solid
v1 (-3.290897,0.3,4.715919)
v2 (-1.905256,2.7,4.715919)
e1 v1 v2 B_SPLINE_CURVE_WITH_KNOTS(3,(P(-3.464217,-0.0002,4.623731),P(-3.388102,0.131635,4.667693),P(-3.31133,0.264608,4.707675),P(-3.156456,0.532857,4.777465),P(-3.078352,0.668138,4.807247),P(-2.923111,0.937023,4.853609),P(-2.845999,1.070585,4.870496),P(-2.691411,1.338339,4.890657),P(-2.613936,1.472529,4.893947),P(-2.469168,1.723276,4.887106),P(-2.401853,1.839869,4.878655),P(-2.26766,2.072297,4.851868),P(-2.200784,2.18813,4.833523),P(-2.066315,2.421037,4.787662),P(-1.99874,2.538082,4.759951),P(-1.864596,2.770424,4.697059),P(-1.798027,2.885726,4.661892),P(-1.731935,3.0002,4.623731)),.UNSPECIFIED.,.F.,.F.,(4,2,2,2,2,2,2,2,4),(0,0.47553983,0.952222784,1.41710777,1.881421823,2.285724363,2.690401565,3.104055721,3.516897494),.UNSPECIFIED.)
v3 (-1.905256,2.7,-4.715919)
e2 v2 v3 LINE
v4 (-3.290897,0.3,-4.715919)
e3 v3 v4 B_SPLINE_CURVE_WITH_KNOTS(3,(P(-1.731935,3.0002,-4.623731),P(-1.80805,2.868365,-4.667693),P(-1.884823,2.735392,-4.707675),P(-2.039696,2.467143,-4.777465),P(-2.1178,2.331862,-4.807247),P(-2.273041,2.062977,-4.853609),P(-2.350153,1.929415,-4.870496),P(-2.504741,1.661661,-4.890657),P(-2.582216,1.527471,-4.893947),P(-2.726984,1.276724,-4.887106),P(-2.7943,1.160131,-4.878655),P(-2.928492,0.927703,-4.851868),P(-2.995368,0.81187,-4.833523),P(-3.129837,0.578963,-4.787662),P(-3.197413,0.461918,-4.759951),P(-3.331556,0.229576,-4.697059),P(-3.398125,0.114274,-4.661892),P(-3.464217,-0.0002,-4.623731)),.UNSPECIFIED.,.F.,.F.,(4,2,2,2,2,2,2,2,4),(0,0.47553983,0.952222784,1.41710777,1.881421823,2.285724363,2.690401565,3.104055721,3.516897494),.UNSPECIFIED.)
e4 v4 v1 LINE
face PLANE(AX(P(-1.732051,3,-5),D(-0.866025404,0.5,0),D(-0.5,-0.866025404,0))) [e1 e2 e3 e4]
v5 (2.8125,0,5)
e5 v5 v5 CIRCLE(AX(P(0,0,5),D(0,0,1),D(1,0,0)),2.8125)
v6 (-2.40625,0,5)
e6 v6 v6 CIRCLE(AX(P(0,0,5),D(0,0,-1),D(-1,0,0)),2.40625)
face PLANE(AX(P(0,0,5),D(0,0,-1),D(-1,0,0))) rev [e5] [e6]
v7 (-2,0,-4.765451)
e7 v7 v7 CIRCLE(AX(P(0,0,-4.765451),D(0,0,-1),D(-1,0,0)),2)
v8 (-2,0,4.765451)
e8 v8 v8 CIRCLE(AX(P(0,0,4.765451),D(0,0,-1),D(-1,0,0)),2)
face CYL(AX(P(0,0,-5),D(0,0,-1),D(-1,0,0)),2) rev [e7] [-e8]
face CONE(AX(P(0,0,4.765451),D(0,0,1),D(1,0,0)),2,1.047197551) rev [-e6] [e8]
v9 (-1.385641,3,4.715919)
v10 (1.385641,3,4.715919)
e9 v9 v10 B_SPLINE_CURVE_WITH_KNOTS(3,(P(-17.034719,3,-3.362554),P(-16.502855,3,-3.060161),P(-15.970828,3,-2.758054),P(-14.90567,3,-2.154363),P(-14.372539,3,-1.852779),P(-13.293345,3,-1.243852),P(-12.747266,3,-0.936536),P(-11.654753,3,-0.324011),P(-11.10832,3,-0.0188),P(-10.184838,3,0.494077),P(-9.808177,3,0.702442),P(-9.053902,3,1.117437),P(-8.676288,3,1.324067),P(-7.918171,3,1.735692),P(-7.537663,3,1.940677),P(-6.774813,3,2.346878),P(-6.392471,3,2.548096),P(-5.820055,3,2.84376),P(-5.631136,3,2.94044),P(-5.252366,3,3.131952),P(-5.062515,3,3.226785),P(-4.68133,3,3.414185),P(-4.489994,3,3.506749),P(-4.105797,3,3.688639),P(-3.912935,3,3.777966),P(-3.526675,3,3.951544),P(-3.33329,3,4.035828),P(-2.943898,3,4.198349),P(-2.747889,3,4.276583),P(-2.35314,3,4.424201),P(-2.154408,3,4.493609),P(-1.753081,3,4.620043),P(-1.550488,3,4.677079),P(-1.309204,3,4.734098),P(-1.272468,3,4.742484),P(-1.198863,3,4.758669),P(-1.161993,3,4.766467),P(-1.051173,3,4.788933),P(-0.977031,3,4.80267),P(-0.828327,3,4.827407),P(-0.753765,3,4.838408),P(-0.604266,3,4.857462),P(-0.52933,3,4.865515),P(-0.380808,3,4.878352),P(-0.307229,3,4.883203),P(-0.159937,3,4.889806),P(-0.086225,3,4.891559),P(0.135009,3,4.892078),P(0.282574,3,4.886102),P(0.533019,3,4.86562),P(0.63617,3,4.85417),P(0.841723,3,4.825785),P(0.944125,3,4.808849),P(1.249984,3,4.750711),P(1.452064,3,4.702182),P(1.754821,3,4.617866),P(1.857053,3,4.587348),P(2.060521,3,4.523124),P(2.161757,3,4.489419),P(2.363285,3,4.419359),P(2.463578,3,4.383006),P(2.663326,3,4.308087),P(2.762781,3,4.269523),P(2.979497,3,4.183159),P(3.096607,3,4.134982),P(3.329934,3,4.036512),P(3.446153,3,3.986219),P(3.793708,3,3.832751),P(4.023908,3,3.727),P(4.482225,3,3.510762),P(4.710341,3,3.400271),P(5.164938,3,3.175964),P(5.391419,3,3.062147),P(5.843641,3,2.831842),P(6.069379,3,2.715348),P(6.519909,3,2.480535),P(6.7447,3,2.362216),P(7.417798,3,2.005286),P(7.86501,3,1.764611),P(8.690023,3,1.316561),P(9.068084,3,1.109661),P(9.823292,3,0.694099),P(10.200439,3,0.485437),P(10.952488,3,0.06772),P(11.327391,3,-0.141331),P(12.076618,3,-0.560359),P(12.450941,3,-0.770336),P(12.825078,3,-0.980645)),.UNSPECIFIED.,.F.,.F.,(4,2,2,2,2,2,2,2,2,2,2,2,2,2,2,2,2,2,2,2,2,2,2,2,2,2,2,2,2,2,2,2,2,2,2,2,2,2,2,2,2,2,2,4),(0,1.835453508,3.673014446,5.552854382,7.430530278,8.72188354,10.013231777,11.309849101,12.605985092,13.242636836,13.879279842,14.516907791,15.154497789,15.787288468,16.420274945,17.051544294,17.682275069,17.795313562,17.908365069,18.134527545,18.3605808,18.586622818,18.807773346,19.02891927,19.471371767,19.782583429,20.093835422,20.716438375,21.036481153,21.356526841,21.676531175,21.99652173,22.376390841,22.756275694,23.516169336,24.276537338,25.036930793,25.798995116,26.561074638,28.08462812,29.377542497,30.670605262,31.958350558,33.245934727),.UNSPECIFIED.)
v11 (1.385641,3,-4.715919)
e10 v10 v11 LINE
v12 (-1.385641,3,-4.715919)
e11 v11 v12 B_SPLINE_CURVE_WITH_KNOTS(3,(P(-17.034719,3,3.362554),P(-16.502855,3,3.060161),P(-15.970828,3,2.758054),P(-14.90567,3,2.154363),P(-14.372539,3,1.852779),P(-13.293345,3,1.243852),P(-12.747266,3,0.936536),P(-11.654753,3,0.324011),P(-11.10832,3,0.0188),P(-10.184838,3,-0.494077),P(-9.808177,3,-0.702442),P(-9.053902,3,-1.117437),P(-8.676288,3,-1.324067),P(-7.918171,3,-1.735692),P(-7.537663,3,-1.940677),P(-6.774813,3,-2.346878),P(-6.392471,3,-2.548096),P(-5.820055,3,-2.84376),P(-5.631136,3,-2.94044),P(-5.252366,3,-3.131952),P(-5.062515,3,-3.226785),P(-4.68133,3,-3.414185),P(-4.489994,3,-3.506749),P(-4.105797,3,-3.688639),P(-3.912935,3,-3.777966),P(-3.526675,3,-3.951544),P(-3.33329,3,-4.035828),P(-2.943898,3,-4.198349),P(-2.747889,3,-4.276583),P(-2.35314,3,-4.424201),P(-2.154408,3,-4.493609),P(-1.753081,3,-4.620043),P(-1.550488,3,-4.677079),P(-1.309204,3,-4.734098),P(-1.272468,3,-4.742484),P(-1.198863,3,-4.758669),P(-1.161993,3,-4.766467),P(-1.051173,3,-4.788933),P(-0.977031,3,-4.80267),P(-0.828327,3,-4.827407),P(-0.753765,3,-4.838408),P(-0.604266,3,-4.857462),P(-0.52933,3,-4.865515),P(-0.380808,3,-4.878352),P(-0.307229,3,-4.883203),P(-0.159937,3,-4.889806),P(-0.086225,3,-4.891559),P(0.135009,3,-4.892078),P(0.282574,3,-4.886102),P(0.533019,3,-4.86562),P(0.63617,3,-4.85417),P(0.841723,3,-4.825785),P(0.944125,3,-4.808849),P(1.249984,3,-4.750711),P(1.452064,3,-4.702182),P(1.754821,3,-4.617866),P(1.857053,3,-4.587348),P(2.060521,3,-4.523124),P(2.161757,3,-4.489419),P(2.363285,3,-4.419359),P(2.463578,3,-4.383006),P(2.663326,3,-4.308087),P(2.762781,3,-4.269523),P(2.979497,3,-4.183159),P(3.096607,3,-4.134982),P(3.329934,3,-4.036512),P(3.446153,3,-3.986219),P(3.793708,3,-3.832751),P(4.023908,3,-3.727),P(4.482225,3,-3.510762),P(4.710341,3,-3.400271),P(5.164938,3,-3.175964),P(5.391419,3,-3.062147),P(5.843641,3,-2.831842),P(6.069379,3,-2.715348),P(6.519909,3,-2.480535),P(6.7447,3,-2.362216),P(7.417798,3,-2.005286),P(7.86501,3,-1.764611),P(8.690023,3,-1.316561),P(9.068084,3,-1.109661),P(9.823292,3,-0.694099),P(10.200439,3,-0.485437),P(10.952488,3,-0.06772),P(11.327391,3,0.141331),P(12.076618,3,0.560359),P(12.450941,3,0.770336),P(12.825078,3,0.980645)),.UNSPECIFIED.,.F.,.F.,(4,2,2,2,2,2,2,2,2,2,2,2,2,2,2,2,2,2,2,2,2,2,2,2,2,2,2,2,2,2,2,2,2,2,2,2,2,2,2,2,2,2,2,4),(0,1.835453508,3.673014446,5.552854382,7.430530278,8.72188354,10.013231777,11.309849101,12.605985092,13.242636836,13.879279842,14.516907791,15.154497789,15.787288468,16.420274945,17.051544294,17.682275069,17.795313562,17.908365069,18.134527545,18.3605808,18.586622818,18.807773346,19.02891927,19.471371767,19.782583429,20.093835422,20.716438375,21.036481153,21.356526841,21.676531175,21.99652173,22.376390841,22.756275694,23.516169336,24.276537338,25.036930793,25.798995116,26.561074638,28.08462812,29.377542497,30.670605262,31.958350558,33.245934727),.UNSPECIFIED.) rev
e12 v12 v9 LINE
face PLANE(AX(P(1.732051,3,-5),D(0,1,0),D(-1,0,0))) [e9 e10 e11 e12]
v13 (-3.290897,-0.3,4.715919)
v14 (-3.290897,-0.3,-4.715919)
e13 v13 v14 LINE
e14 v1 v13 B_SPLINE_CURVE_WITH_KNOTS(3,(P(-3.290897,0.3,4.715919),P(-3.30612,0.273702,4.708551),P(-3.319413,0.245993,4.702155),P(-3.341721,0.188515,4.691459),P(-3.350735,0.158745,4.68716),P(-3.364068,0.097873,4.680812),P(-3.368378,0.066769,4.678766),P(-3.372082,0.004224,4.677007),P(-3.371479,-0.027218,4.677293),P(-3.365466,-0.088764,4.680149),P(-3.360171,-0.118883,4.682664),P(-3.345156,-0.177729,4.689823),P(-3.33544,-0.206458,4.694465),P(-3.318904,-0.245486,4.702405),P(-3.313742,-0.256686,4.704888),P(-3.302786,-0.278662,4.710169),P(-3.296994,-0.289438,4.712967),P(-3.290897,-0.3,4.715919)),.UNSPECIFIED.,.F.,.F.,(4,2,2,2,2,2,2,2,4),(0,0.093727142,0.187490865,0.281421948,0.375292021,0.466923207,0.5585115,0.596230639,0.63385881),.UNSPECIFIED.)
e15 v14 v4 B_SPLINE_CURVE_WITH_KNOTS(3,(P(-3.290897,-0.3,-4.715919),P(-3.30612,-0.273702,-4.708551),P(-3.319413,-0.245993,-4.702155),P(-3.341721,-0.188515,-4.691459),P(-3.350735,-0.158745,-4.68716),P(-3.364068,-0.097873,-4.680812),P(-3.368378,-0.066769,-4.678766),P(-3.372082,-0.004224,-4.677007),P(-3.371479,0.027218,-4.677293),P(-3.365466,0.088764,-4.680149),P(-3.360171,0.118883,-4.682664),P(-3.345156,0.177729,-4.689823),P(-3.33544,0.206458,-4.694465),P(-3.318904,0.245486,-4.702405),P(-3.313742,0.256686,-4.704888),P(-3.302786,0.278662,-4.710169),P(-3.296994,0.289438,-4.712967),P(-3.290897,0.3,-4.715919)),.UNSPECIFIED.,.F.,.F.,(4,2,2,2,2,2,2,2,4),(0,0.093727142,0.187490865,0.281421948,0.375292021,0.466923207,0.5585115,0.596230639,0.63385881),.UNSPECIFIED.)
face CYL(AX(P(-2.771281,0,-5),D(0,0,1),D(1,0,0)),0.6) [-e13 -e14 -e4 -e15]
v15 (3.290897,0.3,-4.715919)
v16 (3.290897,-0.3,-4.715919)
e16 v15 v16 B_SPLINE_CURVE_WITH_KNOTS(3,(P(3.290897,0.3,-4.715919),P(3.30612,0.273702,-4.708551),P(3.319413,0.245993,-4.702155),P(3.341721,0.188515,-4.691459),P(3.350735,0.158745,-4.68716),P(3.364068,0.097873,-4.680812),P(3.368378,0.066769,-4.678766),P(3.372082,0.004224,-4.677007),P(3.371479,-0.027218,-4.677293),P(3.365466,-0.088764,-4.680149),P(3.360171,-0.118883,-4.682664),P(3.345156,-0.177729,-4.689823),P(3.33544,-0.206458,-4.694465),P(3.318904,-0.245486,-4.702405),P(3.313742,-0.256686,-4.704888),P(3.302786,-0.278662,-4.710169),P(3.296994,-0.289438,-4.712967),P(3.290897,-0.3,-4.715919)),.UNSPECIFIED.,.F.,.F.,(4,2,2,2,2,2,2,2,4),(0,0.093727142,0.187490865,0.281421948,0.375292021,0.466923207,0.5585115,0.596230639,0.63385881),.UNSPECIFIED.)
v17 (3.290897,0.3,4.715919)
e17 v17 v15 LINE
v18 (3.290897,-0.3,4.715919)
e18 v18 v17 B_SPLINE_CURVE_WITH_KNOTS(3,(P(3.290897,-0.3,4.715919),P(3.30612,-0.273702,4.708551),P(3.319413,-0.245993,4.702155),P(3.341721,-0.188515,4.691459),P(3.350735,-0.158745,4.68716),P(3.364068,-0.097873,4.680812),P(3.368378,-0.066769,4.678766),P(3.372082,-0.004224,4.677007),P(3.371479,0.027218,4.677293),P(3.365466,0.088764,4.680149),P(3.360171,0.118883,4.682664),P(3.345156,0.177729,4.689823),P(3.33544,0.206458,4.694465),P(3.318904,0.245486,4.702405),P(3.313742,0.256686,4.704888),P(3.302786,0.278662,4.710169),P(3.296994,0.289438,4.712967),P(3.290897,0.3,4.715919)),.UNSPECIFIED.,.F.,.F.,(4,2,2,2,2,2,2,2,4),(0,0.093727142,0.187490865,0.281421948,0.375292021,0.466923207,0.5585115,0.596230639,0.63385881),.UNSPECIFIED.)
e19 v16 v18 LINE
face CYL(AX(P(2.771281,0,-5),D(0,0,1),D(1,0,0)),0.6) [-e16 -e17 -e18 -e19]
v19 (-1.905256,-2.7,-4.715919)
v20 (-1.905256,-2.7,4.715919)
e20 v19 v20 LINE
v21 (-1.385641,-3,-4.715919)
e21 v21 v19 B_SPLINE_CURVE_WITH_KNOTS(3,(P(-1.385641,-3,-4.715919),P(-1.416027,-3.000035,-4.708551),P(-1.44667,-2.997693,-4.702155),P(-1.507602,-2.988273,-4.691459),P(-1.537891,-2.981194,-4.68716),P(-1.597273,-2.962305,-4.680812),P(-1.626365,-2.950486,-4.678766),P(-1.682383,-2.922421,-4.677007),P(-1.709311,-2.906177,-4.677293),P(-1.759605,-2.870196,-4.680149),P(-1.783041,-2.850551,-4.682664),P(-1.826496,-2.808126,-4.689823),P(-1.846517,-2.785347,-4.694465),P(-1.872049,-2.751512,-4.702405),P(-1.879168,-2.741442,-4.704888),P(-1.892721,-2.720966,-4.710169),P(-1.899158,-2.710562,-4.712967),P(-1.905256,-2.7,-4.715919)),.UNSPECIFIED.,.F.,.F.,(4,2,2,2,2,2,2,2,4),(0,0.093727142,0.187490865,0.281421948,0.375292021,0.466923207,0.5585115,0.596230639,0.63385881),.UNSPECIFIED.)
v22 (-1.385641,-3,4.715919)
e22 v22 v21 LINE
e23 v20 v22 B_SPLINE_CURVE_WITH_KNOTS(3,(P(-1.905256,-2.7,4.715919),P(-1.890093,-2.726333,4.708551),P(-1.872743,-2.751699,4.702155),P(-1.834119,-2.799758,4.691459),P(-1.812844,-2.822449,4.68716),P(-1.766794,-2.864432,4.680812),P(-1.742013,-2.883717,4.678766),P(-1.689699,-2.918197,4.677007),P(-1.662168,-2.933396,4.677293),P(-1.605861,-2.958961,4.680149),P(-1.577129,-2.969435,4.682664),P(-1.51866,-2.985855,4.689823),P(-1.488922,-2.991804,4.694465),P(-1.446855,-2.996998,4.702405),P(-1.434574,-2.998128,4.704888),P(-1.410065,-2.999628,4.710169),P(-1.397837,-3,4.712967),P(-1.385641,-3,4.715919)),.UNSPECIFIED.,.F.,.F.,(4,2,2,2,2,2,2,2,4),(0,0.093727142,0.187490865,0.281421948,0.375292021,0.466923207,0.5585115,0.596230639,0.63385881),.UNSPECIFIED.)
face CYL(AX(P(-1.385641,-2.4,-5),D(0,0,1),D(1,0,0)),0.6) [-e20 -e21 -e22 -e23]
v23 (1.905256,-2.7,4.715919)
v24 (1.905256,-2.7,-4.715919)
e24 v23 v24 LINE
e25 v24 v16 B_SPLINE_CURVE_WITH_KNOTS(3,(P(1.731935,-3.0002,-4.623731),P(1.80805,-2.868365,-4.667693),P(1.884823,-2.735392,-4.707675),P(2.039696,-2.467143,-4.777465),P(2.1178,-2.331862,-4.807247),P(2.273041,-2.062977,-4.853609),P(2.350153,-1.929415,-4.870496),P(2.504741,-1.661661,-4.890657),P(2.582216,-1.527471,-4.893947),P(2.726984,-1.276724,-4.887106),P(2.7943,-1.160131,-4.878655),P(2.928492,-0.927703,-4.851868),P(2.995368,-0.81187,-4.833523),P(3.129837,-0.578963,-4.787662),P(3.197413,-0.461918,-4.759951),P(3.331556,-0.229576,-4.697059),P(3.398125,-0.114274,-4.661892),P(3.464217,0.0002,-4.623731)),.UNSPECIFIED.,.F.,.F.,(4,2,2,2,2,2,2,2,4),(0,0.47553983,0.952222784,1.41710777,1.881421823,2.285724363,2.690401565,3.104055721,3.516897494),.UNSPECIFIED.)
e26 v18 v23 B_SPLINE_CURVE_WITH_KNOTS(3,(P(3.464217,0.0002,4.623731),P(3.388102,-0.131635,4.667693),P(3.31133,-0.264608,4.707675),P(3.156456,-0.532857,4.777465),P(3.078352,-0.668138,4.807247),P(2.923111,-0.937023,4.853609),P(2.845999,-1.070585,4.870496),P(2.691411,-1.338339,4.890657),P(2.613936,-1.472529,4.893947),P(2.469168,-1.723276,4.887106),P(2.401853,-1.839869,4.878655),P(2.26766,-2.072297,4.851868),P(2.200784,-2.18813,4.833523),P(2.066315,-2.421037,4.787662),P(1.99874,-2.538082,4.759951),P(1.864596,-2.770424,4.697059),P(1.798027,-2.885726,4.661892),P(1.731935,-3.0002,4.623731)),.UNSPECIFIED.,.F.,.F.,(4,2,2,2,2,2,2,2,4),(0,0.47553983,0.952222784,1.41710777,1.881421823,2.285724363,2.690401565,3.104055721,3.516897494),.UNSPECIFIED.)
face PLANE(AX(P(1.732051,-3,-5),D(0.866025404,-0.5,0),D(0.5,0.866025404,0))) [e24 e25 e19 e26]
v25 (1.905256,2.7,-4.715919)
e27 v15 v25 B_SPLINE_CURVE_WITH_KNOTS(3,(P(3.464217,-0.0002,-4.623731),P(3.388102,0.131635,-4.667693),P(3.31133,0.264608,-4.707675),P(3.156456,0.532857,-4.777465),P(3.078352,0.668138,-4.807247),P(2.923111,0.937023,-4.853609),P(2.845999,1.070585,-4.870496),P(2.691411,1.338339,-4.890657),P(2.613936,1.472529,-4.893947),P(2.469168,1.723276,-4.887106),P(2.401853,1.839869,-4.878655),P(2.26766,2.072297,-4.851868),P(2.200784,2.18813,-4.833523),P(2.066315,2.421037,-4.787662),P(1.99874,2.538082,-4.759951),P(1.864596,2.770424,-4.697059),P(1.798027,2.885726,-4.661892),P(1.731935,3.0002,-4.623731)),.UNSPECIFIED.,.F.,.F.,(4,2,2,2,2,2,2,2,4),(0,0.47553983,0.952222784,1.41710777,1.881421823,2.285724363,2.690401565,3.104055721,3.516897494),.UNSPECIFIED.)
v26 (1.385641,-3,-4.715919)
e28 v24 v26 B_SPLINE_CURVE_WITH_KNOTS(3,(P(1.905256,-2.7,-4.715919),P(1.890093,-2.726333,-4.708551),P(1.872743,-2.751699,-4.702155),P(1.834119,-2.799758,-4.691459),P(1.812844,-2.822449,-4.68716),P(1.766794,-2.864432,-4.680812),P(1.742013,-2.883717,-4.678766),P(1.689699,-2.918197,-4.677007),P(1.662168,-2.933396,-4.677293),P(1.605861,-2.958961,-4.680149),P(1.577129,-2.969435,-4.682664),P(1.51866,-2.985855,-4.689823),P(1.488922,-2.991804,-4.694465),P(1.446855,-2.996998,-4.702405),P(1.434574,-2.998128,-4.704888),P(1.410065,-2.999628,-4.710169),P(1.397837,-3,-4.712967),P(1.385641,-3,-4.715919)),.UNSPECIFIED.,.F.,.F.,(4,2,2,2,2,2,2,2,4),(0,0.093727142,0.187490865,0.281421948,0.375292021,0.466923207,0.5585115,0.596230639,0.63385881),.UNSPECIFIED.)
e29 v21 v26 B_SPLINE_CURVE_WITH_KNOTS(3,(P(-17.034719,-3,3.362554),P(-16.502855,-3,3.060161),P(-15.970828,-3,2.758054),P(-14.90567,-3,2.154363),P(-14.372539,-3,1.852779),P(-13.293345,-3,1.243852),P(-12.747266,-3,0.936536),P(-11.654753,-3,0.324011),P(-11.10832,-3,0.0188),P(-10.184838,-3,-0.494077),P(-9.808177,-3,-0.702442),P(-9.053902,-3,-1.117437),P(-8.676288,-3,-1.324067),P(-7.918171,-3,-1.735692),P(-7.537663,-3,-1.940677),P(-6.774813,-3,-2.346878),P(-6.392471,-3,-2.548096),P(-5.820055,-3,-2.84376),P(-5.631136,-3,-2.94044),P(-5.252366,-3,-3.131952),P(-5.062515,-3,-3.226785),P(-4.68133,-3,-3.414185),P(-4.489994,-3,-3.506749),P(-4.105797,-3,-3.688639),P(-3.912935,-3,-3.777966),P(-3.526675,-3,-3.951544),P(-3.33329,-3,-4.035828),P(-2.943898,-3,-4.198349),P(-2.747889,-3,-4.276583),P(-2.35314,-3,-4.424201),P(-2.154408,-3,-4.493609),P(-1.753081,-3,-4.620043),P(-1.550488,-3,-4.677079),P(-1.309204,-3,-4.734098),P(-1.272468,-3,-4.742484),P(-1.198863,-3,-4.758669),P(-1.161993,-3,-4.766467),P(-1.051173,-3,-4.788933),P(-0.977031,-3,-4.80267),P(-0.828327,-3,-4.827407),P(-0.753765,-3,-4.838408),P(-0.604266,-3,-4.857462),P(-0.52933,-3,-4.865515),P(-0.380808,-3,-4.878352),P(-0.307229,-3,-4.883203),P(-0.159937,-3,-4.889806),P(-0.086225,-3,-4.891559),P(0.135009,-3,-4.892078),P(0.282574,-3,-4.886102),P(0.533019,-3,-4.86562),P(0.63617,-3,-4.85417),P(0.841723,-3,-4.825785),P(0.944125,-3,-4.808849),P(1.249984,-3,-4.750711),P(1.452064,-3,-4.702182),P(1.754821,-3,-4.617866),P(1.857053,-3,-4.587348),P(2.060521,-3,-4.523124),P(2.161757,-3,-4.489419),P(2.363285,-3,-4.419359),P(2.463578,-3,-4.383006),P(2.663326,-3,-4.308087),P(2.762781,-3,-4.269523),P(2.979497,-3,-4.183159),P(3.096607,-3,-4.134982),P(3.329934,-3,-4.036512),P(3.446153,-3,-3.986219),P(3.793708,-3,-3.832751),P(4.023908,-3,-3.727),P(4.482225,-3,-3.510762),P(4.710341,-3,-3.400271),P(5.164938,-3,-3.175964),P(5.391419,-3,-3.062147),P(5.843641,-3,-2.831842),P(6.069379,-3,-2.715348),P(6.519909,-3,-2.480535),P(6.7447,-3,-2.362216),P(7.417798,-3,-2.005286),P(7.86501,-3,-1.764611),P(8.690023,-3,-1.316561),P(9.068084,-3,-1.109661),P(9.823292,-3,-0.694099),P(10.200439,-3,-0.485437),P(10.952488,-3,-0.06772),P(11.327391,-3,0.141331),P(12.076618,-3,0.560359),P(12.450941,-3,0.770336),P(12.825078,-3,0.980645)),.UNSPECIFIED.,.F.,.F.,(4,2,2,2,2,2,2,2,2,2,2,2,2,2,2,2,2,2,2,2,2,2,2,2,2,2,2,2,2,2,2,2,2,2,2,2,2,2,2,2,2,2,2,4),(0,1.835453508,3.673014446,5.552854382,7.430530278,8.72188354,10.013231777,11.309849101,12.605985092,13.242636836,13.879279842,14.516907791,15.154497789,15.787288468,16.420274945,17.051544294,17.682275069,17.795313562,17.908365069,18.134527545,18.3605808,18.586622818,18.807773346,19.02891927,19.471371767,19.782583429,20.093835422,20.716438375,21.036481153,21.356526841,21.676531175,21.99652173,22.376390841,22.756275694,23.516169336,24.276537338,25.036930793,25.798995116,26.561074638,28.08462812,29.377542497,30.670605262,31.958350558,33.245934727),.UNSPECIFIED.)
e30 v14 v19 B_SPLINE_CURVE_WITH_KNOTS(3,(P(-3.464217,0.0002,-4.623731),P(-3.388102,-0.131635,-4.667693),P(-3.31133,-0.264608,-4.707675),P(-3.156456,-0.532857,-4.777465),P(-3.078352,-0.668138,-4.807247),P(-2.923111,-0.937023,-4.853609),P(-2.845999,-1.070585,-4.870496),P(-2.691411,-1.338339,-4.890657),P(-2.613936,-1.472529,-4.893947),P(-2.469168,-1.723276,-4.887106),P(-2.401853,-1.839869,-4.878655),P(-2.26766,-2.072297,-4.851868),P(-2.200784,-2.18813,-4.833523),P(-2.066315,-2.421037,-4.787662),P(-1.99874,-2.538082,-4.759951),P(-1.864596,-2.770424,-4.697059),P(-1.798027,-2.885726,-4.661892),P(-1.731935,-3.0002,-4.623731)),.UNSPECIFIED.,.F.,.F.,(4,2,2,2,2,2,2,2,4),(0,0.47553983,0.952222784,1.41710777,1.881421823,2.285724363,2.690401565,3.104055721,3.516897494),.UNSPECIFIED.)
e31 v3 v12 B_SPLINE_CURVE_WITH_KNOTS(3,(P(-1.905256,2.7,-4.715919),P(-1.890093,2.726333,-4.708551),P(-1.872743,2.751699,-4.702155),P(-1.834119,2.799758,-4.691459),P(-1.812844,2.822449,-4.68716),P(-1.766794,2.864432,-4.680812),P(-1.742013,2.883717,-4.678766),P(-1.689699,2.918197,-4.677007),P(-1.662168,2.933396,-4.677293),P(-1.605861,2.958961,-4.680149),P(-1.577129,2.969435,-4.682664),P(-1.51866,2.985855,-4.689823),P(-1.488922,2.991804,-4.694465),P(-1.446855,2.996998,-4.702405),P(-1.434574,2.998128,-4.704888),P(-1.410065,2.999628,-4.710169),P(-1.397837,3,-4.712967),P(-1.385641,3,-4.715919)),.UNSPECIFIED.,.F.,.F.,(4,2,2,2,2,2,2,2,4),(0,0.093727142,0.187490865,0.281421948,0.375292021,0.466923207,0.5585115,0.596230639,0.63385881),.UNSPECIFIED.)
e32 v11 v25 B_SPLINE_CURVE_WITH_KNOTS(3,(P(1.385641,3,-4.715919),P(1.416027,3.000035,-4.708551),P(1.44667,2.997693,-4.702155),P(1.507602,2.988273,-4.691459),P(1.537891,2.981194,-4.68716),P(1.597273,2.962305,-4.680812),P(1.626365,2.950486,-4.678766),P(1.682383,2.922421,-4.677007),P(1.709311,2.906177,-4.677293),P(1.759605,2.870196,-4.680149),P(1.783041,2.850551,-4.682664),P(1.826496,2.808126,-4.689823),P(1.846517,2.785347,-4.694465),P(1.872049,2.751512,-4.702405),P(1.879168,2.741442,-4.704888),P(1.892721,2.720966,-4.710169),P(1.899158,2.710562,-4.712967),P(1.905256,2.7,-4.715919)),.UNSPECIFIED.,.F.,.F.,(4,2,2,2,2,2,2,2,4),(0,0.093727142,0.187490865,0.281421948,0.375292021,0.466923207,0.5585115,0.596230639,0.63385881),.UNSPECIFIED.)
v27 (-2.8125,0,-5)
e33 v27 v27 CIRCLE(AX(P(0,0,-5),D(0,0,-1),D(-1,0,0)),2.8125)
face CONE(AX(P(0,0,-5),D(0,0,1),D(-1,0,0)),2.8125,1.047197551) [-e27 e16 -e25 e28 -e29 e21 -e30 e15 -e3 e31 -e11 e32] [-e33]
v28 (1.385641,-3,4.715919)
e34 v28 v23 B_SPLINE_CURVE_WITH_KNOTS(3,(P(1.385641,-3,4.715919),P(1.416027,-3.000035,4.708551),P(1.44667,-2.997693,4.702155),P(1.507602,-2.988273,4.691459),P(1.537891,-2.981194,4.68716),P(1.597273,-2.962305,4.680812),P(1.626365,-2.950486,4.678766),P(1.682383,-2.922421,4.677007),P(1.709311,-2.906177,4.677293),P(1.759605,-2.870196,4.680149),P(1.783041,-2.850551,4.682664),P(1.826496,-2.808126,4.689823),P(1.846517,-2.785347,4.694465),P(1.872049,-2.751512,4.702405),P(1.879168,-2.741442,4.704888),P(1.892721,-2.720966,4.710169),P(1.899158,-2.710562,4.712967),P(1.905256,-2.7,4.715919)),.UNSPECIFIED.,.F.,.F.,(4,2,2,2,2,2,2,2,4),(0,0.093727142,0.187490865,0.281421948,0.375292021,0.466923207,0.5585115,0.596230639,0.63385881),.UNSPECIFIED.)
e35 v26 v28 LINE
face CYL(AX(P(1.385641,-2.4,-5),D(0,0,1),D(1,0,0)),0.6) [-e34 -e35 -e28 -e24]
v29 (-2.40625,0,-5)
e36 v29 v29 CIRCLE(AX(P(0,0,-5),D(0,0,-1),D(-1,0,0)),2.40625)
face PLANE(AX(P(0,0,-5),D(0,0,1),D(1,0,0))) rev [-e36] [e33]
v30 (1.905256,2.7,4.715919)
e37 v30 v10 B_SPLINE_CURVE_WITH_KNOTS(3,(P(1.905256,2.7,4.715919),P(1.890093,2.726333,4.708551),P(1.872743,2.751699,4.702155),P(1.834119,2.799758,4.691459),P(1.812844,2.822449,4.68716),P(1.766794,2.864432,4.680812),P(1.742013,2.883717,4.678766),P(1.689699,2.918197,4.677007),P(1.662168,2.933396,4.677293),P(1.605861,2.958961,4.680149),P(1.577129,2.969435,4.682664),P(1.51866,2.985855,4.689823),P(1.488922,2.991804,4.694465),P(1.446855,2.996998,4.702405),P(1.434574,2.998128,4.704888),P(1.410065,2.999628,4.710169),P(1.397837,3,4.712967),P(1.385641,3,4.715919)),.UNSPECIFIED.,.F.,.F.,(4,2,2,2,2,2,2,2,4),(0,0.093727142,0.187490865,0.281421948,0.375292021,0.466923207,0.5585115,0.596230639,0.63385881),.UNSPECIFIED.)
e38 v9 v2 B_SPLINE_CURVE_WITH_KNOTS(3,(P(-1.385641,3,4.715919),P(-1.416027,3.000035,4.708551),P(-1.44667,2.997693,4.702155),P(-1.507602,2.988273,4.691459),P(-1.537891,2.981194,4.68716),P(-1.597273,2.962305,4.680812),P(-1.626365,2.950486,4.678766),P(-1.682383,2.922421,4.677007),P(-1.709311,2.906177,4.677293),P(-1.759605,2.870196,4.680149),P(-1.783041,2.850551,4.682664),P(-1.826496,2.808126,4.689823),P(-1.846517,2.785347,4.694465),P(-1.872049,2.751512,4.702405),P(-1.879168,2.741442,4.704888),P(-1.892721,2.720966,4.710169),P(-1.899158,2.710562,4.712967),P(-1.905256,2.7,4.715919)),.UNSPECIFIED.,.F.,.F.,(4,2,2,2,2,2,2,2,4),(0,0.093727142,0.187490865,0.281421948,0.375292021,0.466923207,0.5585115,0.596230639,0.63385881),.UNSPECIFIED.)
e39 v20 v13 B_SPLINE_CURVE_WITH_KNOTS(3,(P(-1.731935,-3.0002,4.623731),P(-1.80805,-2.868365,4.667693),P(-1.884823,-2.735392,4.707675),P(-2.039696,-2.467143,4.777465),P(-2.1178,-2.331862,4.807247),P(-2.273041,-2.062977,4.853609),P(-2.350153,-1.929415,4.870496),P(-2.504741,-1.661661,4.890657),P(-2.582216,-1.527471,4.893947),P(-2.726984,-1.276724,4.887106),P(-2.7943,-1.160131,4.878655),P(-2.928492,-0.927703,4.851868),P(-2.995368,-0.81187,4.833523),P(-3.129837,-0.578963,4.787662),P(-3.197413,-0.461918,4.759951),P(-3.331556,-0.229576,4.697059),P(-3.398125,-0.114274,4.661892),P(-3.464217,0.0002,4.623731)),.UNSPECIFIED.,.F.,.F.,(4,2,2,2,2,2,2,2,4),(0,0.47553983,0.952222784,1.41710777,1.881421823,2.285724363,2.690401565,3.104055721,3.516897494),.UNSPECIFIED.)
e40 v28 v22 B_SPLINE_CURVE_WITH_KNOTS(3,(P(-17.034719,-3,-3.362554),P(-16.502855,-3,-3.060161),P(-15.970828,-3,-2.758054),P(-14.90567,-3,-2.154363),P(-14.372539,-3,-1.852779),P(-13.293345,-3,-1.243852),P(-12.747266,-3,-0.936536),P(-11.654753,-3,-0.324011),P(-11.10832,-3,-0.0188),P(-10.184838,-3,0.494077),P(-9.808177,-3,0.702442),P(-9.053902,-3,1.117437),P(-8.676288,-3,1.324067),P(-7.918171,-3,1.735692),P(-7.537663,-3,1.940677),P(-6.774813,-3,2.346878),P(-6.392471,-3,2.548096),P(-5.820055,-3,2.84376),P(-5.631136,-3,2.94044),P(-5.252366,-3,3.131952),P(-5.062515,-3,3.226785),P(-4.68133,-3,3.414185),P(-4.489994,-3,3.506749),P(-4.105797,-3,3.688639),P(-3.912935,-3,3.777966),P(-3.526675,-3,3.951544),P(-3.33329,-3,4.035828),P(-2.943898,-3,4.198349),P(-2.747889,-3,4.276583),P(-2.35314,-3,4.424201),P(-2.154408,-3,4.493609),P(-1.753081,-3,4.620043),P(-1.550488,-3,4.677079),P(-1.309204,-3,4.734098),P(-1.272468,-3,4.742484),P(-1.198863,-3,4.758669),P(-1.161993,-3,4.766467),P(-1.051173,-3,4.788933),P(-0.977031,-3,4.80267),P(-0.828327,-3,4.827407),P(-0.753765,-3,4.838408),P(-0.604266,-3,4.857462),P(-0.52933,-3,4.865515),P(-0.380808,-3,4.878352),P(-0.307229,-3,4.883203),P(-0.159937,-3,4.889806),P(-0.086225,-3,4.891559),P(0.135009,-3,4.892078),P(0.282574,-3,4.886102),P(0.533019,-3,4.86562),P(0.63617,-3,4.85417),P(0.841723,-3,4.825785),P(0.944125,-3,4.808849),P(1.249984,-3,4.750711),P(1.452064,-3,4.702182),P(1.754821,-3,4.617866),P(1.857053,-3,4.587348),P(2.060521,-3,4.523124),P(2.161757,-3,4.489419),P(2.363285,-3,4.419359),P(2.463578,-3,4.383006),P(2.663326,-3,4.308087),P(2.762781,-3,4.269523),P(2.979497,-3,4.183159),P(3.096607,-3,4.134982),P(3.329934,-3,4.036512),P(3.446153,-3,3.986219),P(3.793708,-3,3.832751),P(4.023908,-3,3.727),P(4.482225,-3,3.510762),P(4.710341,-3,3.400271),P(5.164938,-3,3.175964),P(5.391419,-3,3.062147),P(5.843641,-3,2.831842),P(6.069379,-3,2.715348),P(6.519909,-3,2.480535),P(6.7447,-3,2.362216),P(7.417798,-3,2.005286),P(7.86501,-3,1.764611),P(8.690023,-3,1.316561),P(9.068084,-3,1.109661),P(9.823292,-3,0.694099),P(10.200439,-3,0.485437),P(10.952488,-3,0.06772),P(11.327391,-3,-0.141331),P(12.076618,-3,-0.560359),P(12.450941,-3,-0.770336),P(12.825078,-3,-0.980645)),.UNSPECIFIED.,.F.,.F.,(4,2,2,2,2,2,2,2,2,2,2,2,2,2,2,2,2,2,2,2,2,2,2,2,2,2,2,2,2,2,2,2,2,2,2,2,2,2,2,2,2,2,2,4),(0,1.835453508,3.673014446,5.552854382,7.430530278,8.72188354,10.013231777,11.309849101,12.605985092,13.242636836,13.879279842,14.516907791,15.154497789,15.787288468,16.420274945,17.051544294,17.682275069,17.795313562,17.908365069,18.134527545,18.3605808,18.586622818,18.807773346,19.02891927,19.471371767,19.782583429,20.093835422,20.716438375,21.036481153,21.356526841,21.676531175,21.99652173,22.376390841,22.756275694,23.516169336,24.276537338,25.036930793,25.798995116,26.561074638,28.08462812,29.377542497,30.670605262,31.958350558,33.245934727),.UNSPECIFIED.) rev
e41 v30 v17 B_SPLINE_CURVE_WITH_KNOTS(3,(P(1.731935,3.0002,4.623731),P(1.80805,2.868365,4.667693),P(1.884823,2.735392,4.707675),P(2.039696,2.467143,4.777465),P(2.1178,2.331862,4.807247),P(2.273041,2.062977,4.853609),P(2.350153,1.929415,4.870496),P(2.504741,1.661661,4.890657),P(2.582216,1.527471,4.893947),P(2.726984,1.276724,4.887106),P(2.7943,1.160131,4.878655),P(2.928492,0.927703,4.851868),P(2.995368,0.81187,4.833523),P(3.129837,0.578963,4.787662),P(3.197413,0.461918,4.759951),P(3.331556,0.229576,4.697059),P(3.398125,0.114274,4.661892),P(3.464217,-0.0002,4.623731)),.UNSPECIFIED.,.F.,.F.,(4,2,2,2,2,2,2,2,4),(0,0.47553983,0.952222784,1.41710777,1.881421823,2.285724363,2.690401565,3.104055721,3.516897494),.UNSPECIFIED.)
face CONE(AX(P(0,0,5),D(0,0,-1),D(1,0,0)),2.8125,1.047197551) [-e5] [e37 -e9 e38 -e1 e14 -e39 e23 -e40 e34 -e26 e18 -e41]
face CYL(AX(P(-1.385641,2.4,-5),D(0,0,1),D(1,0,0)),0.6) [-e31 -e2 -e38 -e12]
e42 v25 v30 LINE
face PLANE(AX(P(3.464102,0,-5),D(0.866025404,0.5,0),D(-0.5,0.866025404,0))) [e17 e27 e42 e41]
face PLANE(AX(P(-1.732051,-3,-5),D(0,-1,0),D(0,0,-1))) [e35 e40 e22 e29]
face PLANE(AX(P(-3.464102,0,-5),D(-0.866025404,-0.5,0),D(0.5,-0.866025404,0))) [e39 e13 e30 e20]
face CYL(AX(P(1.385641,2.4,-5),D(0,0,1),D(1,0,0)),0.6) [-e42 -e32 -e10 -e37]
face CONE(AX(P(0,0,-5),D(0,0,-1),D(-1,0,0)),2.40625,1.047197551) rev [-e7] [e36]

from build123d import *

# Parameters (mm, degrees)
SKETCH4_R           = 2.5
BOSS_EXTRUDE1_DEPTH = 5
SKETCH5_OUTSIDE_W   = 53.21
SKETCH5_OUTSIDE_H   = 52.282
SKETCH5_OUTSIDE_R   = 2.8125
CUT_EXTRUDE1_DEPTH  = 12
CUT_EXTRUDE1_DRAFT  = -60
SKETCH6_OUTSIDE_W   = 53.21
SKETCH6_OUTSIDE_H   = 52.282
SKETCH6_OUTSIDE_R   = 2.8125
CUT_EXTRUDE2_DEPTH  = 12
CUT_EXTRUDE2_DRAFT  = -60
FILLET1_R           = 0.6


with BuildPart() as part:
    # Sketch3 → Revolve1 (revolve)
    with BuildSketch(Plane(origin=(0, 0, 0), x_dir=(0, 0, -1), z_dir=(1, 0, 0)), mode=Mode.PRIVATE) as revolve1_sk:
        Polygon((5, 2.40625), (5, 3), (0, 3), (-5, 3), (-5, 2.40625), (-4.765451453, 2), (4.765451453, 2), align=None)
        Polygon((5, 2.40625), (5, 3), (0, 3), (-5, 3), (-5, 2.40625), (-4.765451453, 2), (4.765451453, 2), align=None)
    revolve(revolve1_sk.sketch.rotate(Axis((0, 0, -5), (0, 0, 1)), 90), axis=Axis((0, 0, -5), (0, 0, 1)))

    # Sketch4 → Boss-Extrude1 (add, symmetric)
    with BuildSketch(Plane.XY):
        Polygon((-1.732050808, 3), (-3.464101615, 0), (-1.732050808, -3), (1.732050808, -3), (3.464101615, 0), (1.732050808, 3), align=None)
        Circle(SKETCH4_R, mode=Mode.SUBTRACT)
    extrude(amount=BOSS_EXTRUDE1_DEPTH, both=True)


with BuildPart() as cut_extrude1_tool:
    # Sketch5 outside → Cut-Extrude1 (with draft: the straight prism first)
    with BuildSketch(Plane.XY.offset(5)):
        Rectangle(SKETCH5_OUTSIDE_W, SKETCH5_OUTSIDE_H)
        Circle(SKETCH5_OUTSIDE_R, mode=Mode.SUBTRACT)
    extrude(amount=-CUT_EXTRUDE1_DEPTH)
    # Cut-Extrude1: the draft: its side faces are tilted about the plane it starts from
    cut_extrude1_sides = [cut_extrude1_tool.faces().sort_by_distance(p)[0] for p in [
        (0, -26.141, -1),
        (26.605, 0, -1),
        (0, 26.141, -1),
        (-26.605, 0, -1),
        (-2.8125, 0, -1),
    ]]
    draft(cut_extrude1_sides, Plane.XY.offset(5), CUT_EXTRUDE1_DRAFT)


with BuildPart() as part_1:
    add(part.part)

    # Cut-Extrude1: cut by cut_extrude1_tool
    add(cut_extrude1_tool.part, mode=Mode.SUBTRACT)


with BuildPart() as cut_extrude2_tool:
    # Sketch6 outside → Cut-Extrude2 (with draft: the straight prism first)
    with BuildSketch(Plane(origin=(0, 0, -5), x_dir=(-1, 0, 0), z_dir=(0, 0, -1))):
        Rectangle(SKETCH6_OUTSIDE_W, SKETCH6_OUTSIDE_H)
        Circle(SKETCH6_OUTSIDE_R, mode=Mode.SUBTRACT)
    extrude(amount=-CUT_EXTRUDE2_DEPTH)
    # Cut-Extrude2: the draft: its side faces are tilted about the plane it starts from
    cut_extrude2_sides = [cut_extrude2_tool.faces().sort_by_distance(p)[0] for p in [
        (0, -26.141, 1),
        (-26.605, 0, 1),
        (0, 26.141, 1),
        (26.605, 0, 1),
        (2.8125, 0, 1),
    ]]
    draft(cut_extrude2_sides, Plane(origin=(0, 0, -5), x_dir=(-1, 0, 0), z_dir=(0, 0, -1)), CUT_EXTRUDE2_DRAFT)


with BuildPart() as part_2:
    add(part_1.part)

    # Cut-Extrude2: cut by cut_extrude2_tool
    add(cut_extrude2_tool.part, mode=Mode.SUBTRACT)

    # Fillet1
    # the kernel refuses this fillet: 0.6 mm, written as the material it takes off along each edge
    with BuildSketch(Plane(origin=(1.732050808, 3, 5.489823036), x_dir=(0.4999999999999995, -0.866025403784439, 0), z_dir=(0, 0, -1)), Plane(origin=(-3.464101615, 0, -5.489823036), x_dir=(0.5000000000000011, -0.8660254037844379, 0), z_dir=(0, 0, 1)), Plane(origin=(3.464101615, 0, 5.489823036), x_dir=(-0.4999999999999996, -0.8660254037844388, 0), z_dir=(0, 0, -1)), Plane(origin=(-1.732050808, 3, 5.489823036), x_dir=(1, 0, 0), z_dir=(0, 0, -1))) as fillet1_piece_1:
        with BuildLine():
            CenterArc((FILLET1_R * 0.57735026919, FILLET1_R), FILLET1_R, 210, 60)
            Line((-FILLET1_R * 0.288675134595, FILLET1_R * 0.5), (0, 0))
            Line((0, 0), (FILLET1_R * 0.57735026919, 0))
        make_face()
    extrude(amount=10.979646072, mode=Mode.SUBTRACT)
    with BuildSketch(Plane(origin=(-1.732050808, -3, -5.489823036), x_dir=(-0.5000000000000002, 0.8660254037844385, 0), z_dir=(0, 0, 1)), Plane(origin=(1.732050808, -3, -5.489823036), x_dir=(-1, 0, 0), z_dir=(0, 0, 1))) as fillet1_piece_2:
        with BuildLine():
            CenterArc((FILLET1_R * 0.57735026919, -FILLET1_R), FILLET1_R, 90, 60)
            Line((-FILLET1_R * 0.288675134595, -FILLET1_R * 0.5), (0, 0))
            Line((0, 0), (FILLET1_R * 0.57735026919, 0))
        make_face()
    extrude(amount=10.979646072, mode=Mode.SUBTRACT)


solid = part_2.part
